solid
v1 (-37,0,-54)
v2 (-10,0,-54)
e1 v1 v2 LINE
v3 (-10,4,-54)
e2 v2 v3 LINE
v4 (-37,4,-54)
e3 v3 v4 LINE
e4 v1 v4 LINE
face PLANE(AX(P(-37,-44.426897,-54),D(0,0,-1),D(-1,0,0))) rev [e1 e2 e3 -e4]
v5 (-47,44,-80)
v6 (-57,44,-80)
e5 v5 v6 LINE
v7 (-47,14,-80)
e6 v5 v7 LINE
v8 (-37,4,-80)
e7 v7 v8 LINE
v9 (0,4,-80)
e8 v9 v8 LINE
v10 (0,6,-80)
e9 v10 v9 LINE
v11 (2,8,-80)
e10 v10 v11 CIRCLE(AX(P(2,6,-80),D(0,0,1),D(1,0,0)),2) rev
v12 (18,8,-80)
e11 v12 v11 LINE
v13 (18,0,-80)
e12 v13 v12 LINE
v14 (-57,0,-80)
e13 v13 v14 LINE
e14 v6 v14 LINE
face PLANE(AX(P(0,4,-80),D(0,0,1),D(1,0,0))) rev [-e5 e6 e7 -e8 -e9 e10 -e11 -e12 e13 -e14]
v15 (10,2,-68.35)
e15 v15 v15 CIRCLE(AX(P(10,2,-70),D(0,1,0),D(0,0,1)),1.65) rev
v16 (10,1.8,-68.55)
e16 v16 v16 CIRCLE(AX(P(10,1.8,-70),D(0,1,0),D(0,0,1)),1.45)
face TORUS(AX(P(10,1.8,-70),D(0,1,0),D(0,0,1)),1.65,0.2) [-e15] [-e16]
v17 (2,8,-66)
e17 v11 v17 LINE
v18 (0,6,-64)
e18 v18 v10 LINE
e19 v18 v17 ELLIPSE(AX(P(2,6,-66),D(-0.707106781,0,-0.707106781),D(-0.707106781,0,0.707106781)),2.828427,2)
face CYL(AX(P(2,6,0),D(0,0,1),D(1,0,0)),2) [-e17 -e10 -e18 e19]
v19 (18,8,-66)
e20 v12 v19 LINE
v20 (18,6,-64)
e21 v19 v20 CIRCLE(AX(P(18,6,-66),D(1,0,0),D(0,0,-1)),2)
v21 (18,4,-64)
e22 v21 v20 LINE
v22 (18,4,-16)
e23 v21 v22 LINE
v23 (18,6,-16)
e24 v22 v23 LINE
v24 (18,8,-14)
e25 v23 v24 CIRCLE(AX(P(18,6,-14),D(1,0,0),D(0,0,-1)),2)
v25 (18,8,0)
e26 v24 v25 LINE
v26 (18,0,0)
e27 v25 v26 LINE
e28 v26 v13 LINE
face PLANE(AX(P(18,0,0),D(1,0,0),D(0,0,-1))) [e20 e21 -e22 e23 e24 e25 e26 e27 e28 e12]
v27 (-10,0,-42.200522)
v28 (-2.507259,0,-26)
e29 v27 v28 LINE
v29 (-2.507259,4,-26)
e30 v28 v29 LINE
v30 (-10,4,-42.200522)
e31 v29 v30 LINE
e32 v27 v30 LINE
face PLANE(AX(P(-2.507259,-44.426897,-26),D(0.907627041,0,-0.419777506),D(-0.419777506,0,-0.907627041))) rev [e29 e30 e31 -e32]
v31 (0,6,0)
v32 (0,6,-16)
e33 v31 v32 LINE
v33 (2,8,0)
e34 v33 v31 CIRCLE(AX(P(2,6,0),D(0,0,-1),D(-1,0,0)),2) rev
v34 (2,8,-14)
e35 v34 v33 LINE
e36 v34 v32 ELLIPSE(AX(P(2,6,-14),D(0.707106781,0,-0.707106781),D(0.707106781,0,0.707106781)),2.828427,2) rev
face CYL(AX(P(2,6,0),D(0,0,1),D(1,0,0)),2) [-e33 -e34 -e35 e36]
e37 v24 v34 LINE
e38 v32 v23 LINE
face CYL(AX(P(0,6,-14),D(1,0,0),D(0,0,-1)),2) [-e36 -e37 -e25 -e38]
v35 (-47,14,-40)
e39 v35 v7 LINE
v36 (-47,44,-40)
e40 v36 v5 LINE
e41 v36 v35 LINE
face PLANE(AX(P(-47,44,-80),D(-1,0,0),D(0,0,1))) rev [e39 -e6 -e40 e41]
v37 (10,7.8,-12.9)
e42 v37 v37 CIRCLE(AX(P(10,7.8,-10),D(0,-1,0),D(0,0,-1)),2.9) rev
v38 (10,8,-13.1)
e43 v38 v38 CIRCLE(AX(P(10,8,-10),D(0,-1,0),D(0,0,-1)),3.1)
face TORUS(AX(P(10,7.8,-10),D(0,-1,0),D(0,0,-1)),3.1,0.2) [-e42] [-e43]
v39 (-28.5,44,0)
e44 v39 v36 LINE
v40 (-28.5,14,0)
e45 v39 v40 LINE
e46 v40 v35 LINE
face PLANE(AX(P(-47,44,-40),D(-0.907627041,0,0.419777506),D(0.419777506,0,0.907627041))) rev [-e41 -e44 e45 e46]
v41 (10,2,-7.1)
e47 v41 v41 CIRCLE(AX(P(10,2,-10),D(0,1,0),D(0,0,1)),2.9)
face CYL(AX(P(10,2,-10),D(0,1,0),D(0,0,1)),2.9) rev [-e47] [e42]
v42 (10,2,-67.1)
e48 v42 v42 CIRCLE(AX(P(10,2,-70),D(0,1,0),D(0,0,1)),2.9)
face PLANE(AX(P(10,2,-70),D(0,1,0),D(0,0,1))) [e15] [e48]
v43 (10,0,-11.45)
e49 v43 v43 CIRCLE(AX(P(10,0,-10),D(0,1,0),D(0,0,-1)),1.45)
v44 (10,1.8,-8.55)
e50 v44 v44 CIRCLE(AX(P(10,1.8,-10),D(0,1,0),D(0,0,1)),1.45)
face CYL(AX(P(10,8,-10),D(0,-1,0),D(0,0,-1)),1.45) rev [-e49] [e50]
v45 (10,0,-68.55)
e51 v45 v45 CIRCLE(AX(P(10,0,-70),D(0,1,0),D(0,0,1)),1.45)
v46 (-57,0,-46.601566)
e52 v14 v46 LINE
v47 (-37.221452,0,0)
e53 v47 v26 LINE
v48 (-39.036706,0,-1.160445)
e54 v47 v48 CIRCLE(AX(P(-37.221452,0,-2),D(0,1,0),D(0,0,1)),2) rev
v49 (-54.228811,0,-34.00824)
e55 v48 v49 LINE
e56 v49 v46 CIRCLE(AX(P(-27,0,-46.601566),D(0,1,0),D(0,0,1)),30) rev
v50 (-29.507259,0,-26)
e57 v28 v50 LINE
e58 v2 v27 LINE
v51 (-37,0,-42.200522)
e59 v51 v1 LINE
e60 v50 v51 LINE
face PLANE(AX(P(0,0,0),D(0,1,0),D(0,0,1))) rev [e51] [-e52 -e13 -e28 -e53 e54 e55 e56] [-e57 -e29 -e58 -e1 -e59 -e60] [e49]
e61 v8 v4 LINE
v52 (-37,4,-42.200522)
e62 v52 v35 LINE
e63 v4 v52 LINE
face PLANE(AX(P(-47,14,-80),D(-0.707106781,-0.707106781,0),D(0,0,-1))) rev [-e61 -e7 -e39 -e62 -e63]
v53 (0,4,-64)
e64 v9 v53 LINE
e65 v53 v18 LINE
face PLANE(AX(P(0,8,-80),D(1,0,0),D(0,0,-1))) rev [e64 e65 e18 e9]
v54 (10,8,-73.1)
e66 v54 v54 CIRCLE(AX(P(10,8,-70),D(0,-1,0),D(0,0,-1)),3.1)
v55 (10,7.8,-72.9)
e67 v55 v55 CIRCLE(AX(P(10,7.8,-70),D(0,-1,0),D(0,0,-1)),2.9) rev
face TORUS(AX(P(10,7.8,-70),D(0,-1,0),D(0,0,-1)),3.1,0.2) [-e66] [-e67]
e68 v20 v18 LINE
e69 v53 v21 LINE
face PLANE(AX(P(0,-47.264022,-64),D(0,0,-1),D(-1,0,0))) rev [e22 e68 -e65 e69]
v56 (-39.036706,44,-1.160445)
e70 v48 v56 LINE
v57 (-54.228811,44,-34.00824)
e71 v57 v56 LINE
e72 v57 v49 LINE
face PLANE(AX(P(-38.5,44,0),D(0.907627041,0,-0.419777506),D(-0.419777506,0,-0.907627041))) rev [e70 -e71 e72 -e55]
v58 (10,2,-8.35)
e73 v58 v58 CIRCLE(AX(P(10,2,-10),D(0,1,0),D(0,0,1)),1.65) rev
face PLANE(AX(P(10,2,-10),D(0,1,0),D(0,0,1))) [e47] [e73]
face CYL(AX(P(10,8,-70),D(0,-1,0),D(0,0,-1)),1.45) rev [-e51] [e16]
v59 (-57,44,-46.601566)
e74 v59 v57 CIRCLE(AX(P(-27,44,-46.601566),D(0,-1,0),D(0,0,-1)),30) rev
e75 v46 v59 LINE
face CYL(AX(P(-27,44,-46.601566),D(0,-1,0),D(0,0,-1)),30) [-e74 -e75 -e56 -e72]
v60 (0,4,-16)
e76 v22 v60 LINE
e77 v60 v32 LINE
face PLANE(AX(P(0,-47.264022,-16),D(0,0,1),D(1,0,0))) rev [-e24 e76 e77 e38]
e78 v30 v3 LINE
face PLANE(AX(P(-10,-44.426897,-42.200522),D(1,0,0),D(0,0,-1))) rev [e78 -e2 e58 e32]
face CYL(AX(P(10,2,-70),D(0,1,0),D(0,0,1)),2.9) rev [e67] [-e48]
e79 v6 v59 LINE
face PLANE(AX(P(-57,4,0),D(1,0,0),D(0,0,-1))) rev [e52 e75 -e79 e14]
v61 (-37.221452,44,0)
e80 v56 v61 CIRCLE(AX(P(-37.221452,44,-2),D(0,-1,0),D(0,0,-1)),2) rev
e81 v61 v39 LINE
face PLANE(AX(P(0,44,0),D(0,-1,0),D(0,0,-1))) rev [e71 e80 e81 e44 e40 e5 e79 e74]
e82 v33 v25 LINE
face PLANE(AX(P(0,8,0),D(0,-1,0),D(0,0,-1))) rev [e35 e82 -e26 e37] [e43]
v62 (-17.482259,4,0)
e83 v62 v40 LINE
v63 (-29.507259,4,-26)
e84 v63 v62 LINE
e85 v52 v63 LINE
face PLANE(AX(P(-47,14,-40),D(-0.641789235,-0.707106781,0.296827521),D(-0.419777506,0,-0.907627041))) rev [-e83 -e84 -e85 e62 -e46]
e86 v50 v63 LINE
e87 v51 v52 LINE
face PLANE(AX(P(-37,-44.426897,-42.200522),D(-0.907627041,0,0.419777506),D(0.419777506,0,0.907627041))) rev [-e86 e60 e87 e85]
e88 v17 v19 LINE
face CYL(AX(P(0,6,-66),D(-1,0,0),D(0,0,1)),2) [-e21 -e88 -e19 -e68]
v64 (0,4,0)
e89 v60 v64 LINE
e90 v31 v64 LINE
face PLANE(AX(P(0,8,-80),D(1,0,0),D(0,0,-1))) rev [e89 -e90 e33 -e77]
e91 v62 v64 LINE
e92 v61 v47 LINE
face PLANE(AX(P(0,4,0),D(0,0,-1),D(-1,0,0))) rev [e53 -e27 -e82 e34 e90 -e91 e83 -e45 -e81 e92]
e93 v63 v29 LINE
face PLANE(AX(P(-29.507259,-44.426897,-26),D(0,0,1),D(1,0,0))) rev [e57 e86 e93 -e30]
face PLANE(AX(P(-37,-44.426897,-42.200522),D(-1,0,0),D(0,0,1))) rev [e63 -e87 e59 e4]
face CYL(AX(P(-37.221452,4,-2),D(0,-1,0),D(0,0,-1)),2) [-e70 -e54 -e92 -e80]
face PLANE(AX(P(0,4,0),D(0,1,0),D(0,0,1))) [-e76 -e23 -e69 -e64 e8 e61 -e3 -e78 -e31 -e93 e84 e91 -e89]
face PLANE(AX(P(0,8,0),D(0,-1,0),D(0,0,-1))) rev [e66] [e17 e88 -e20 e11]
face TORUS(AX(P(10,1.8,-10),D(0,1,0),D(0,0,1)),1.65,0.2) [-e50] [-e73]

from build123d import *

# Parameters (mm, degrees)
SKETCH_1_W               = 57
SKETCH_1_H               = 80
EXTRUDE_1_DEPTH          = 4
EXTRUDE_2_DEPTH          = 40
CUT_EXTRUDE_1_DEPTH      = 16
SKETCH_4_W               = 80
SKETCH_4_H               = 4
EXTRUDE_3_DEPTH          = 20
SKETCH_7_W               = 20
SKETCH_7_H               = 80
EXTRUDE_4_DEPTH          = 4
CUT_EXTRUDE_2_DEPTH      = 4
CUT_EXTRUDE_2_DEPTH_BACK = 4
SKETCH_5_R               = 1.45
SKETCH_8_R               = 2.9
CUT_EXTRUDE_3_DEPTH      = 6
SKETCH_9_W               = 80
SKETCH_9_H               = 8
CUT_EXTRUDE_4_DEPTH      = 2
SKETCH_10_W              = 18
SKETCH_10_H              = 48
CUT_EXTRUDE_5_DEPTH      = 4
CUT_EXTRUDE_6_DEPTH      = 4
CHAMFER_1_SIZE           = 10
FILLET_1_R               = 30
FILLET_2_R               = 2
FILLET_3_R               = 0.2


with BuildPart() as part:
    # 草图1 → 凸台-拉伸1 (new body)
    with BuildSketch(Plane(origin=(0, 0, 0), x_dir=(1, 0, 0), z_dir=(0, 1, 0))):
        with Locations((-28.5, 40)):
            Rectangle(SKETCH_1_W, SKETCH_1_H)
    extrude(amount=EXTRUDE_1_DEPTH)

    # 草图2 → 凸台-拉伸2 (add)
    with BuildSketch(Plane(origin=(0, 4, 0), x_dir=(1, 0, 0), z_dir=(0, 1, 0))):
        Polygon((-47, 40), (-28.5, 0), (-38.5, 0), (-57, 40), (-57, 80), (-47, 80), align=None)
    extrude(amount=EXTRUDE_2_DEPTH)

    # 草图3 → 切除-拉伸1 (cut)
    with BuildSketch(Plane(origin=(0, 4, 0), x_dir=(1, 0, 0), z_dir=(0, 1, 0))):
        Polygon((-38.5, 0), (-57, 40), (-57, 0), align=None)
    extrude(amount=-CUT_EXTRUDE_1_DEPTH, mode=Mode.SUBTRACT)

    # 草图4 → 凸台-拉伸3 (add)
    with BuildSketch(Plane(origin=(0, 0, 0), x_dir=(0, 0, -1), z_dir=(1, 0, 0))):
        with Locations((40, 2)):
            Rectangle(SKETCH_4_W, SKETCH_4_H)
    extrude(amount=EXTRUDE_3_DEPTH)

    # 草图7 → 凸台-拉伸4 (add)
    with BuildSketch(Plane(origin=(0, 4, 0), x_dir=(1, 0, 0), z_dir=(0, 1, 0))):
        with Locations((10, 40)):
            Rectangle(SKETCH_7_W, SKETCH_7_H)
    extrude(amount=EXTRUDE_4_DEPTH)

    # 草图5 → 切除-拉伸2 (cut, two sides: drawn at the far end of the back side and taken through both)
    with BuildSketch(Plane(origin=(0, 4, 0), x_dir=(1, 0, 0), z_dir=(0, 1, 0)).offset(-CUT_EXTRUDE_2_DEPTH_BACK)):
        with Locations(Location((10, 70, 0), (0, 0, 270))):
            Circle(SKETCH_5_R)
        with Locations(Location((10, 10, 0), (0, 0, 90))):
            Circle(SKETCH_5_R)
    extrude(amount=CUT_EXTRUDE_2_DEPTH + CUT_EXTRUDE_2_DEPTH_BACK, mode=Mode.SUBTRACT)

    # 草图8 → 切除-拉伸3 (cut)
    with BuildSketch(Plane(origin=(0, 8, 0), x_dir=(1, 0, 0), z_dir=(0, 1, 0))):
        with Locations(Location((10, 70, 0), (0, 0, 270))):
            Circle(SKETCH_8_R)
        with Locations(Location((10, 10, 0), (0, 0, 270))):
            Circle(SKETCH_8_R)
    extrude(amount=-CUT_EXTRUDE_3_DEPTH, mode=Mode.SUBTRACT)

    # 草图9 → 切除-拉伸4 (cut)
    with BuildSketch(Plane(origin=(20, 0, 0), x_dir=(0, 0, -1), z_dir=(1, 0, 0))):
        with Locations((40, 4)):
            Rectangle(SKETCH_9_W, SKETCH_9_H)
    extrude(amount=-CUT_EXTRUDE_4_DEPTH, mode=Mode.SUBTRACT)

    # 草图10 → 切除-拉伸5 (cut)
    with BuildSketch(Plane(origin=(0, 8, 0), x_dir=(1, 0, 0), z_dir=(0, 1, 0))):
        with Locations((9, 40)):
            Rectangle(SKETCH_10_W, SKETCH_10_H)
    extrude(amount=-CUT_EXTRUDE_5_DEPTH, mode=Mode.SUBTRACT)

    # 草图11 → 切除-拉伸6 (cut)
    with BuildSketch(Plane(origin=(0, 4, 0), x_dir=(1, 0, 0), z_dir=(0, 1, 0))):
        Polygon((-37, 42.200521891), (-29.507258625, 26), (-2.507258625, 26), (-10, 42.200521891), (-10, 54), (-37, 54), align=None)
    extrude(amount=-CUT_EXTRUDE_6_DEPTH, mode=Mode.SUBTRACT)

    # 倒角1
    chamfer_1_edges = [part.edges().sort_by_distance(p)[0] for p in [
        (-37.75, 4, -20),
        (-47, 4, -60),
    ]]
    chamfer(chamfer_1_edges, length=CHAMFER_1_SIZE - 0.0001)  # a hair under: the kernel refuses the full size

    # 圆角1
    fillet_1_edges = [part.edges().sort_by_distance(p)[0] for p in [
        (-57, 22, -40),
    ]]
    fillet(fillet_1_edges, radius=FILLET_1_R)

    # 圆角2
    fillet_2_edges = [part.edges().sort_by_distance(p)[0] for p in [
        (0, 8, -8),
        (9, 8, -16),
        (9, 8, -64),
        (-38.5, 22, 0),
        (0, 8, -72),
    ]]
    fillet(fillet_2_edges, radius=FILLET_2_R)

    # 圆角3
    fillet_3_edges = [part.edges().sort_by_distance(p)[0] for p in [
        (10, 2, -71.45),
        (10, 8, -72.9),
        (10, 2, -8.55),
        (10, 8, -12.9),
    ]]
    fillet(fillet_3_edges, radius=FILLET_3_R)


solid = part.part
